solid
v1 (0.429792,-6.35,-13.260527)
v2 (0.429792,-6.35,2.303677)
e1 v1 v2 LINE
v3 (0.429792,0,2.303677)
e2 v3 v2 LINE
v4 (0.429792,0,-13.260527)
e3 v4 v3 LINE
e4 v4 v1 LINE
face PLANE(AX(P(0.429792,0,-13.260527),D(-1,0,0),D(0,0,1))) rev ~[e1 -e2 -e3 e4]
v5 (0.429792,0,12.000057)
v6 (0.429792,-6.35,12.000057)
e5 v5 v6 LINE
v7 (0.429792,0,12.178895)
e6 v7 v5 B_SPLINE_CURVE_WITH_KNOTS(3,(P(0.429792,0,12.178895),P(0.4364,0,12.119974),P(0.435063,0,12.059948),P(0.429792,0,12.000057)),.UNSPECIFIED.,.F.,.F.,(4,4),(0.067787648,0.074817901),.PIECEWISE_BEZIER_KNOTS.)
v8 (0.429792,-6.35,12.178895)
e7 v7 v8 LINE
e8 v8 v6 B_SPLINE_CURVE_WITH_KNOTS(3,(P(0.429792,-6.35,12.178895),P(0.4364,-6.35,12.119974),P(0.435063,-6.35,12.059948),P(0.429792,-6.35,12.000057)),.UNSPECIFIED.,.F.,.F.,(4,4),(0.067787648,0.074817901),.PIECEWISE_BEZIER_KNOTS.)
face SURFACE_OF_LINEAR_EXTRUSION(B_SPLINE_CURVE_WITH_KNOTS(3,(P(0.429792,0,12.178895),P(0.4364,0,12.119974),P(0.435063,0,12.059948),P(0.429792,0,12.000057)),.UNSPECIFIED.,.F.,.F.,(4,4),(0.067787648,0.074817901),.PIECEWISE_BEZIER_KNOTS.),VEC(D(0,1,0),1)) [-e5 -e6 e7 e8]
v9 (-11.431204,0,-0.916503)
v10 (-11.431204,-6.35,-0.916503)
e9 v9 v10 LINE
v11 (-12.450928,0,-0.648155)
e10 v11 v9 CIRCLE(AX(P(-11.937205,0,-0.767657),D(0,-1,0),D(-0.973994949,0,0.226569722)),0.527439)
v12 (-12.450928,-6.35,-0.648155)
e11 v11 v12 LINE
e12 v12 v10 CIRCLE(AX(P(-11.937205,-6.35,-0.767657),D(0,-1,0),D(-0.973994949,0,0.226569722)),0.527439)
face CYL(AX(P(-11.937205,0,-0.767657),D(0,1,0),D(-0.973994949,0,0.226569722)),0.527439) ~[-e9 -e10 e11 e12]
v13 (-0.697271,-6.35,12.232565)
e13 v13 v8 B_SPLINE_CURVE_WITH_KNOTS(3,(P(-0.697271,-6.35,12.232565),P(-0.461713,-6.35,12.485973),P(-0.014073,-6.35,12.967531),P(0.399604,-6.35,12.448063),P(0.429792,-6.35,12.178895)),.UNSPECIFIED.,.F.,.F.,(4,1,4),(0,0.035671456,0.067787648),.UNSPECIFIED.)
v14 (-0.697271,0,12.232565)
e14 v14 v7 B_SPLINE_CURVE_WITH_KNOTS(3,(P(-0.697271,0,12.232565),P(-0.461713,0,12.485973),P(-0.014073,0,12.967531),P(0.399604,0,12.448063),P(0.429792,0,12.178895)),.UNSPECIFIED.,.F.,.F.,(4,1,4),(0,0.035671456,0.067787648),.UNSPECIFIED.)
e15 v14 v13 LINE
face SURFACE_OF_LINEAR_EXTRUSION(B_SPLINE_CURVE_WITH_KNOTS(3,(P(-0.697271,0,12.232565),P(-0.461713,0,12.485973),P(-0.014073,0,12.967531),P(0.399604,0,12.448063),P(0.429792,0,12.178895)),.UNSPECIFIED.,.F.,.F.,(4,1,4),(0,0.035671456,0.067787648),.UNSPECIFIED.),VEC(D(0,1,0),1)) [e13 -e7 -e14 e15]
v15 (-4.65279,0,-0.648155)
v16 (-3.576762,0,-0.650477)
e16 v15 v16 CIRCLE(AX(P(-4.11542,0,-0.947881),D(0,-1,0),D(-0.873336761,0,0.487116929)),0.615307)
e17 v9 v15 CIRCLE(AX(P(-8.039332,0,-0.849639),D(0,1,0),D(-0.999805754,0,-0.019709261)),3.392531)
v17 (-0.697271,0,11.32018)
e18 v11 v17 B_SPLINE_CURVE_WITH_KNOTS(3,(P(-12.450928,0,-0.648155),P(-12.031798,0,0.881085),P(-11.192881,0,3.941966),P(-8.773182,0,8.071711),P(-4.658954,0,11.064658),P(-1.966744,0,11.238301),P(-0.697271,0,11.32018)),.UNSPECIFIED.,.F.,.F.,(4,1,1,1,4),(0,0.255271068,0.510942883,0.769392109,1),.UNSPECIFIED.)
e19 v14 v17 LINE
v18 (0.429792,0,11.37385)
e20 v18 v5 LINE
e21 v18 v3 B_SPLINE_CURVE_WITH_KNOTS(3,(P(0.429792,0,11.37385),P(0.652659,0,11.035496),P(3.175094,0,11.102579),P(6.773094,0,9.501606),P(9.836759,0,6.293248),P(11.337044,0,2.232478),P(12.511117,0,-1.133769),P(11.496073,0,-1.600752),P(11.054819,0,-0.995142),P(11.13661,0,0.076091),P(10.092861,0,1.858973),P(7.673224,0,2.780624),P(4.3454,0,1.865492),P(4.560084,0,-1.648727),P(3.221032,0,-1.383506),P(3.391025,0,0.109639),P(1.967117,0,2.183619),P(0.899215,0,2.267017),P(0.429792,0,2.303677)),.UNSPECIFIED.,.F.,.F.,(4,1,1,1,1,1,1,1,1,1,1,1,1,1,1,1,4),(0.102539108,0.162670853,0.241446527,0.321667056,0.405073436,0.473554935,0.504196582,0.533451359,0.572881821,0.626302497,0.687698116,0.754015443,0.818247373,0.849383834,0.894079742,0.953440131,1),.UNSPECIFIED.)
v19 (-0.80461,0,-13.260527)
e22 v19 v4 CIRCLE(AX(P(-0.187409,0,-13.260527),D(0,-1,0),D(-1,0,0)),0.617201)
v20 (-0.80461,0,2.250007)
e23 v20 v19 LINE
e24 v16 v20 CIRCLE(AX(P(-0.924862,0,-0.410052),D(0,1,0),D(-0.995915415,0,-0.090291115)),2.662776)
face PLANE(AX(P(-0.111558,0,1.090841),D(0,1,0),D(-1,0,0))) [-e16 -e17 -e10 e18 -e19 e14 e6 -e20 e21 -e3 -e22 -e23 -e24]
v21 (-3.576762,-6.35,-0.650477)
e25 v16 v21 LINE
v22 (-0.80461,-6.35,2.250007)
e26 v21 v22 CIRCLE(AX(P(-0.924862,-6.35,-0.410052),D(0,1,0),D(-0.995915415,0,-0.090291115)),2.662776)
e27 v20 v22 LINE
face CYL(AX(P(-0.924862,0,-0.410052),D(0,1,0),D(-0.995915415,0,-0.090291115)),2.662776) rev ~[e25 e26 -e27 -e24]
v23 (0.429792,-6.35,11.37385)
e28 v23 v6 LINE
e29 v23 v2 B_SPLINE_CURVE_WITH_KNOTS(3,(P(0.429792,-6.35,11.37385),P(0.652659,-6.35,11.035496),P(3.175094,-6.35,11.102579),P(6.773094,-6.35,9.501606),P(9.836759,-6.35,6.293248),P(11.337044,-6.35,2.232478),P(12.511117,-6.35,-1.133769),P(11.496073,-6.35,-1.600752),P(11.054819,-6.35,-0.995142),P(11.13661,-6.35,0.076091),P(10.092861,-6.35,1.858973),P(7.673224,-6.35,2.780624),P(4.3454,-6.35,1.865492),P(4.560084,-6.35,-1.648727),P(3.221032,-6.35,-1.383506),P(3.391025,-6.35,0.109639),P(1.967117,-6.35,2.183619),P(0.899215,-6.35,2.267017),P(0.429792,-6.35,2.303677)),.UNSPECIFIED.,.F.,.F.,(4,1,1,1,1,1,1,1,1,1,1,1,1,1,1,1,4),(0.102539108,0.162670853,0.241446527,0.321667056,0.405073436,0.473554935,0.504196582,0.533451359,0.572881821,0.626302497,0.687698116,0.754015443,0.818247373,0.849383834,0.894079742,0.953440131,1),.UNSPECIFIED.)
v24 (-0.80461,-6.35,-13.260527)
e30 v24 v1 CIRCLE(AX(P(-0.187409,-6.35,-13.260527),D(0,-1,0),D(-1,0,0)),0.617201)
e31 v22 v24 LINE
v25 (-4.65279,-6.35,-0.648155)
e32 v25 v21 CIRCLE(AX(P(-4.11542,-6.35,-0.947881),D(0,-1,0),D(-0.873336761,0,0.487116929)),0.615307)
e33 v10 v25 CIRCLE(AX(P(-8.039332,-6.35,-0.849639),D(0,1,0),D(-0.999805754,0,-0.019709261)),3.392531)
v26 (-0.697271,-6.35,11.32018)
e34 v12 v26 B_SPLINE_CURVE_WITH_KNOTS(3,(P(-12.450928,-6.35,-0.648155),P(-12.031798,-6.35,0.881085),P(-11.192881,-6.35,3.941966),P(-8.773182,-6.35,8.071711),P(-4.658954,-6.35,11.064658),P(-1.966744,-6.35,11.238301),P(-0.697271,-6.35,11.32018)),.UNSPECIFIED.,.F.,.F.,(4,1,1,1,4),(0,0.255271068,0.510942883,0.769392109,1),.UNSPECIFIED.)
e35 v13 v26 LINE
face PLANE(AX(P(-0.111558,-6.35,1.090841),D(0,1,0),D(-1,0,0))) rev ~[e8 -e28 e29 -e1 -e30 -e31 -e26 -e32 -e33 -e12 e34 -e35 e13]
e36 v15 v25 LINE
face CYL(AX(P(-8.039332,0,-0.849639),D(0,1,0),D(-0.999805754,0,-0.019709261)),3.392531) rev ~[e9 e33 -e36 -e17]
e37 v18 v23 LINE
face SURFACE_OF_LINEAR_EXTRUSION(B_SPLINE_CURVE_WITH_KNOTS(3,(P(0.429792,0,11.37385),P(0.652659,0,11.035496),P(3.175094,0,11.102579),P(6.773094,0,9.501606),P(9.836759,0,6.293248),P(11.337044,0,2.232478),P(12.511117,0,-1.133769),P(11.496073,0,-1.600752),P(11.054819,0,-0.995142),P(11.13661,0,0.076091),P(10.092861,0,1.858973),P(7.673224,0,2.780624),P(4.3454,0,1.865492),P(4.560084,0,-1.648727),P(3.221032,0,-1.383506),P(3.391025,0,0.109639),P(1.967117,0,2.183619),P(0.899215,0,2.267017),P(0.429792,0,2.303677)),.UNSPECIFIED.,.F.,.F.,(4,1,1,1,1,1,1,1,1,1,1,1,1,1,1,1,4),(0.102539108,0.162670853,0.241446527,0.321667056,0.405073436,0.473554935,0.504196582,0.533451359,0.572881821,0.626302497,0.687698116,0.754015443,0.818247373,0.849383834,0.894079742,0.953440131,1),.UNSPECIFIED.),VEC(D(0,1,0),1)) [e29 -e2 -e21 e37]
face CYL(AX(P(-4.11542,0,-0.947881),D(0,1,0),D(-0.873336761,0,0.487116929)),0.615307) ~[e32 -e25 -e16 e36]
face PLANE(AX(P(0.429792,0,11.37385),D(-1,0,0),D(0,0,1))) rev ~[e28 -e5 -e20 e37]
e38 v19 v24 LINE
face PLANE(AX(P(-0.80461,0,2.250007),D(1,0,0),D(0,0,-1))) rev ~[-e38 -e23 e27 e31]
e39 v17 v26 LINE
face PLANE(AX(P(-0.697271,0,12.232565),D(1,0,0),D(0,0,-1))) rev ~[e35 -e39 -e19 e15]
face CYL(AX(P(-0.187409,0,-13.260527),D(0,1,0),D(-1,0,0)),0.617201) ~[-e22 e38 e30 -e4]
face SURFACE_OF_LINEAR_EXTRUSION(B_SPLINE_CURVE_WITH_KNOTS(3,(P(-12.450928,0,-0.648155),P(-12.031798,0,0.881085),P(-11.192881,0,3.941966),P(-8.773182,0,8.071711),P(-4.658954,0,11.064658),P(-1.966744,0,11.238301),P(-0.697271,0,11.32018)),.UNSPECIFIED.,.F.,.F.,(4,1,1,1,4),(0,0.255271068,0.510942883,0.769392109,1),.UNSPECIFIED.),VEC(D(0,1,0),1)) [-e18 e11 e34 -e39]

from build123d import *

# Parameters (mm, degrees)
F1_DEPTH = 6.35


with BuildPart() as f1:
    # F0 (on Front) → F1 (new body)
    with BuildSketch(Plane.XZ):
        with BuildLine():
            add(Edge.make_bspline(
                [(-12.4509278685, -0.6481549935), (-12.0317981163, 0.8810850321), (-11.1928806268, 3.9419658126), (-8.7731819463, 8.0717111222), (-4.6589539948, 11.0646575395), (-1.9667442238, 11.2383011146), (-0.6972711999, 11.3201802596)],
                knots=[0, 0, 0, 0, 0.2552710683, 0.5109428826, 0.7693921089, 1, 1, 1, 1], degree=3))
            ThreePointArc((-12.4509278685, -0.6481549935), (-12.0714345726, -1.2777296563), (-11.4312041551, -0.9165033698))
            ThreePointArc((-11.4312041551, -0.9165033698), (-8.1735331436, 2.540236173), (-4.6527902596, -0.6481549935))
            ThreePointArc((-4.6527902596, -0.6481549935), (-4.1167481077, -1.5631866704), (-3.5767615773, -0.65047713))
            ThreePointArc((-3.5767615773, -0.65047713), (-2.8498328125, 1.4297474764), (-0.8046104922, 2.2500068881))
            Line((-0.8046104922, 2.2500068881), (-0.8046104922, -13.2605265826))
            ThreePointArc((-0.8046104922, -13.2605265826), (-0.1874094887, -13.8777275861), (0.4297915148, -13.2605265826))
            Line((0.4297915148, -13.2605265826), (0.4297915148, 2.3036766797))
            add(Edge.make_bspline(
                [(0.4297915148, 11.3738495857), (0.6526590266, 11.0354959137), (3.1750938666, 11.1025792799), (6.7730940941, 9.5016063693), (9.8367590632, 6.2932480095), (11.3370440892, 2.2324782786), (12.5111170003, -1.1337690095), (11.4960734497, -1.6007523467), (11.0548187099, -0.9951418024), (11.1366100355, 0.0760910817), (10.0928611655, 1.858972596), (7.6732235172, 2.7806239453), (4.3454002919, 1.8654920892), (4.560083764, -1.648726748), (3.221032359, -1.3835064308), (3.3910248353, 0.1096392917), (1.9671173501, 2.1836191556), (0.899214588, 2.2670170656), (0.4297915148, 2.3036766797)],
                knots=[0.1025391075, 0.1025391075, 0.1025391075, 0.1025391075, 0.1626708527, 0.2414465269, 0.3216670559, 0.4050734358, 0.4735549353, 0.5041965823, 0.5334513595, 0.5728818213, 0.6263024965, 0.6876981158, 0.7540154426, 0.8182473727, 0.849383834, 0.8940797423, 0.9534401308, 1, 1, 1, 1], degree=3))
            add(Edge.make_bspline(
                [(0.4297915148, 12.0000571072), (0.4090063726, 11.7638984672), (0.3270478417, 11.5298332853), (0.4297915148, 11.3738495857)],
                knots=[0.0748179008, 0.0748179008, 0.0748179008, 0.0748179008, 0.1025391075, 0.1025391075, 0.1025391075, 0.1025391075], degree=3))
            Line((0.4297915148, 12.0000571072), (0.4297915148, 12.1788950637))
            add(Edge.make_bspline(
                [(-0.6972711999, 12.232565321), (-0.4617125379, 12.4859727505), (-0.0140726245, 12.9675312669), (0.3996041066, 12.448062951), (0.4297915148, 12.1788950637)],
                knots=[0, 0, 0, 0, 0.0356714562, 0.0677876477, 0.0677876477, 0.0677876477, 0.0677876477], degree=3))
            Line((-0.6972711999, 12.232565321), (-0.6972711999, 11.3201802596))
        make_face()
        with BuildLine():
            add(Edge.make_bspline(
                [(-4.6527902596, 2.2500068881), (-4.6881874921, 3.0714366785), (-4.7572235022, 4.6734894757), (-4.2725077694, 6.7651050781), (-3.8302798792, 8.624568161), (-2.9833358257, 9.3901871644), (-2.6203936393, 9.9507790211), (-2.4440996349, 10.2230785415)],
                knots=[0, 0, 0, 0, 0.2423030576, 0.4725690445, 0.6839878774, 0.8465016065, 1, 1, 1, 1], degree=3))
            ThreePointArc((-4.6527902596, 2.2500068881), (-7.512749867, 3.504606312), (-10.5426330119, 2.7475086972))
            add(Edge.make_bspline(
                [(-2.4440996349, 10.2230785415), (-3.0070766004, 10.1316858633), (-4.257690828, 9.9286633763), (-6.7376812556, 8.6628460438), (-8.7407318384, 6.5446693266), (-9.9049465269, 4.091310483), (-10.5426330119, 2.7475086972)],
                knots=[0, 0, 0, 0, 0.1991808283, 0.442466376, 0.6946167571, 1, 1, 1, 1], degree=3))
        make_face(mode=Mode.SUBTRACT)
        with BuildLine():
            add(Edge.make_bspline(
                [(-0.1412717829, 10.4595618322), (0.1250668674, 10.4148679988), (0.6860593829, 10.3207288041), (1.4339723073, 9.5420411919), (2.0176690385, 9.2792735551), (2.7849622808, 7.8675029191), (3.2129807692, 6.8552668878), (3.426070787, 5.5098999096), (3.5684033089, 3.2815882405), (3.4437081145, 2.3401855324), (3.3891098574, 1.9279888365)],
                knots=[0, 0, 0, 0, 0.10280599, 0.2165415756, 0.3074449242, 0.4471391252, 0.567356297, 0.6988234719, 0.868128731, 1, 1, 1, 1], degree=3))
            ThreePointArc((3.3891098574, 1.9279888365), (-0.1504588872, 3.371185766), (-3.6900276318, 1.9279888365))
            add(Edge.make_bspline(
                [(-0.1412717829, 10.4595618322), (-0.482391014, 10.3318500079), (-1.1763661999, 10.0720322404), (-2.034374878, 9.2356141659), (-2.7630920424, 8.3498824032), (-3.2130686106, 7.0082514597), (-3.7058453302, 5.8544228935), (-3.8051869716, 2.8456866579), (-3.7203032002, 2.1692530116), (-3.6900276318, 1.9279888365)],
                knots=[0, 0, 0, 0, 0.1276600513, 0.2597124399, 0.3909770246, 0.5317726453, 0.6738447952, 0.8836699404, 1, 1, 1, 1], degree=3))
        make_face(mode=Mode.SUBTRACT)
        with BuildLine():
            add(Edge.make_bspline(
                [(2.1224920638, 10.2230785415), (2.4304280303, 10.2765295315), (3.2266466532, 10.4147357766), (5.6068331787, 9.0279478535), (6.8826619925, 8.1843022652), (8.574542946, 6.2175447591), (9.7061171069, 4.1431701929), (9.9614117746, 3.1688551838), (10.0718149915, 2.7475086972)],
                knots=[0, 0, 0, 0, 0.1239955817, 0.3206107828, 0.4761099998, 0.6691251888, 0.8569118428, 1, 1, 1, 1], degree=3))
            ThreePointArc((10.0718149915, 2.7475086972), (7.267371932, 3.4391746522), (4.6350378543, 2.2500068881))
            add(Edge.make_bspline(
                [(4.6350378543, 2.2500068881), (4.6713806841, 2.9541300324), (4.7473255067, 4.4255208857), (4.1589573729, 6.921382003), (3.5565525979, 8.9681272577), (2.5902403363, 9.8137504266), (2.1224920638, 10.2230785415)],
                knots=[0, 0, 0, 0, 0.2503331616, 0.5231157749, 0.769161811, 1, 1, 1, 1], degree=3))
        make_face(mode=Mode.SUBTRACT)
        with BuildLine():
            add(Edge.make_bspline(
                [(0.4297915148, 12.1788950637), (0.4363995561, 12.1199740551), (0.4350627431, 12.0599482599), (0.4297915148, 12.0000571072)],
                knots=[0.0677876477, 0.0677876477, 0.0677876477, 0.0677876477, 0.0748179008, 0.0748179008, 0.0748179008, 0.0748179008], degree=3))
            Line((0.4297915148, 12.1788950637), (0.4297915148, 12.0000571072))
        make_face()
        with BuildLine():
            Line((0.4297915148, 11.3738495857), (0.4297915148, 12.0000571072))
            add(Edge.make_bspline(
                [(0.4297915148, 12.0000571072), (0.4090063726, 11.7638984672), (0.3270478417, 11.5298332853), (0.4297915148, 11.3738495857)],
                knots=[0.0748179008, 0.0748179008, 0.0748179008, 0.0748179008, 0.1025391075, 0.1025391075, 0.1025391075, 0.1025391075], degree=3))
        make_face()
        with BuildLine():
            ThreePointArc((-10.5426330119, 2.7475086972), (-7.512749867, 3.504606312), (-4.6527902596, 2.2500068881))
            add(Edge.make_bspline(
                [(-4.6527902596, 2.2500068881), (-4.6881874921, 3.0714366785), (-4.7572235022, 4.6734894757), (-4.2725077694, 6.7651050781), (-3.8302798792, 8.624568161), (-2.9833358257, 9.3901871644), (-2.6203936393, 9.9507790211), (-2.4440996349, 10.2230785415)],
                knots=[0, 0, 0, 0, 0.2423030576, 0.4725690445, 0.6839878774, 0.8465016065, 1, 1, 1, 1], degree=3))
            add(Edge.make_bspline(
                [(-2.4440996349, 10.2230785415), (-3.0070766004, 10.1316858633), (-4.257690828, 9.9286633763), (-6.7376812556, 8.6628460438), (-8.7407318384, 6.5446693266), (-9.9049465269, 4.091310483), (-10.5426330119, 2.7475086972)],
                knots=[0, 0, 0, 0, 0.1991808283, 0.442466376, 0.6946167571, 1, 1, 1, 1], degree=3))
        make_face()
        with BuildLine():
            ThreePointArc((-3.6900276318, 1.9279888365), (-0.1504588872, 3.371185766), (3.3891098574, 1.9279888365))
            add(Edge.make_bspline(
                [(-0.1412717829, 10.4595618322), (0.1250668674, 10.4148679988), (0.6860593829, 10.3207288041), (1.4339723073, 9.5420411919), (2.0176690385, 9.2792735551), (2.7849622808, 7.8675029191), (3.2129807692, 6.8552668878), (3.426070787, 5.5098999096), (3.5684033089, 3.2815882405), (3.4437081145, 2.3401855324), (3.3891098574, 1.9279888365)],
                knots=[0, 0, 0, 0, 0.10280599, 0.2165415756, 0.3074449242, 0.4471391252, 0.567356297, 0.6988234719, 0.868128731, 1, 1, 1, 1], degree=3))
            add(Edge.make_bspline(
                [(-0.1412717829, 10.4595618322), (-0.482391014, 10.3318500079), (-1.1763661999, 10.0720322404), (-2.034374878, 9.2356141659), (-2.7630920424, 8.3498824032), (-3.2130686106, 7.0082514597), (-3.7058453302, 5.8544228935), (-3.8051869716, 2.8456866579), (-3.7203032002, 2.1692530116), (-3.6900276318, 1.9279888365)],
                knots=[0, 0, 0, 0, 0.1276600513, 0.2597124399, 0.3909770246, 0.5317726453, 0.6738447952, 0.8836699404, 1, 1, 1, 1], degree=3))
        make_face()
        with BuildLine():
            ThreePointArc((4.6350378543, 2.2500068881), (7.267371932, 3.4391746522), (10.0718149915, 2.7475086972))
            add(Edge.make_bspline(
                [(2.1224920638, 10.2230785415), (2.4304280303, 10.2765295315), (3.2266466532, 10.4147357766), (5.6068331787, 9.0279478535), (6.8826619925, 8.1843022652), (8.574542946, 6.2175447591), (9.7061171069, 4.1431701929), (9.9614117746, 3.1688551838), (10.0718149915, 2.7475086972)],
                knots=[0, 0, 0, 0, 0.1239955817, 0.3206107828, 0.4761099998, 0.6691251888, 0.8569118428, 1, 1, 1, 1], degree=3))
            add(Edge.make_bspline(
                [(4.6350378543, 2.2500068881), (4.6713806841, 2.9541300324), (4.7473255067, 4.4255208857), (4.1589573729, 6.921382003), (3.5565525979, 8.9681272577), (2.5902403363, 9.8137504266), (2.1224920638, 10.2230785415)],
                knots=[0, 0, 0, 0, 0.2503331616, 0.5231157749, 0.769161811, 1, 1, 1, 1], degree=3))
        make_face()
    extrude(amount=F1_DEPTH)


solid = f1.part
